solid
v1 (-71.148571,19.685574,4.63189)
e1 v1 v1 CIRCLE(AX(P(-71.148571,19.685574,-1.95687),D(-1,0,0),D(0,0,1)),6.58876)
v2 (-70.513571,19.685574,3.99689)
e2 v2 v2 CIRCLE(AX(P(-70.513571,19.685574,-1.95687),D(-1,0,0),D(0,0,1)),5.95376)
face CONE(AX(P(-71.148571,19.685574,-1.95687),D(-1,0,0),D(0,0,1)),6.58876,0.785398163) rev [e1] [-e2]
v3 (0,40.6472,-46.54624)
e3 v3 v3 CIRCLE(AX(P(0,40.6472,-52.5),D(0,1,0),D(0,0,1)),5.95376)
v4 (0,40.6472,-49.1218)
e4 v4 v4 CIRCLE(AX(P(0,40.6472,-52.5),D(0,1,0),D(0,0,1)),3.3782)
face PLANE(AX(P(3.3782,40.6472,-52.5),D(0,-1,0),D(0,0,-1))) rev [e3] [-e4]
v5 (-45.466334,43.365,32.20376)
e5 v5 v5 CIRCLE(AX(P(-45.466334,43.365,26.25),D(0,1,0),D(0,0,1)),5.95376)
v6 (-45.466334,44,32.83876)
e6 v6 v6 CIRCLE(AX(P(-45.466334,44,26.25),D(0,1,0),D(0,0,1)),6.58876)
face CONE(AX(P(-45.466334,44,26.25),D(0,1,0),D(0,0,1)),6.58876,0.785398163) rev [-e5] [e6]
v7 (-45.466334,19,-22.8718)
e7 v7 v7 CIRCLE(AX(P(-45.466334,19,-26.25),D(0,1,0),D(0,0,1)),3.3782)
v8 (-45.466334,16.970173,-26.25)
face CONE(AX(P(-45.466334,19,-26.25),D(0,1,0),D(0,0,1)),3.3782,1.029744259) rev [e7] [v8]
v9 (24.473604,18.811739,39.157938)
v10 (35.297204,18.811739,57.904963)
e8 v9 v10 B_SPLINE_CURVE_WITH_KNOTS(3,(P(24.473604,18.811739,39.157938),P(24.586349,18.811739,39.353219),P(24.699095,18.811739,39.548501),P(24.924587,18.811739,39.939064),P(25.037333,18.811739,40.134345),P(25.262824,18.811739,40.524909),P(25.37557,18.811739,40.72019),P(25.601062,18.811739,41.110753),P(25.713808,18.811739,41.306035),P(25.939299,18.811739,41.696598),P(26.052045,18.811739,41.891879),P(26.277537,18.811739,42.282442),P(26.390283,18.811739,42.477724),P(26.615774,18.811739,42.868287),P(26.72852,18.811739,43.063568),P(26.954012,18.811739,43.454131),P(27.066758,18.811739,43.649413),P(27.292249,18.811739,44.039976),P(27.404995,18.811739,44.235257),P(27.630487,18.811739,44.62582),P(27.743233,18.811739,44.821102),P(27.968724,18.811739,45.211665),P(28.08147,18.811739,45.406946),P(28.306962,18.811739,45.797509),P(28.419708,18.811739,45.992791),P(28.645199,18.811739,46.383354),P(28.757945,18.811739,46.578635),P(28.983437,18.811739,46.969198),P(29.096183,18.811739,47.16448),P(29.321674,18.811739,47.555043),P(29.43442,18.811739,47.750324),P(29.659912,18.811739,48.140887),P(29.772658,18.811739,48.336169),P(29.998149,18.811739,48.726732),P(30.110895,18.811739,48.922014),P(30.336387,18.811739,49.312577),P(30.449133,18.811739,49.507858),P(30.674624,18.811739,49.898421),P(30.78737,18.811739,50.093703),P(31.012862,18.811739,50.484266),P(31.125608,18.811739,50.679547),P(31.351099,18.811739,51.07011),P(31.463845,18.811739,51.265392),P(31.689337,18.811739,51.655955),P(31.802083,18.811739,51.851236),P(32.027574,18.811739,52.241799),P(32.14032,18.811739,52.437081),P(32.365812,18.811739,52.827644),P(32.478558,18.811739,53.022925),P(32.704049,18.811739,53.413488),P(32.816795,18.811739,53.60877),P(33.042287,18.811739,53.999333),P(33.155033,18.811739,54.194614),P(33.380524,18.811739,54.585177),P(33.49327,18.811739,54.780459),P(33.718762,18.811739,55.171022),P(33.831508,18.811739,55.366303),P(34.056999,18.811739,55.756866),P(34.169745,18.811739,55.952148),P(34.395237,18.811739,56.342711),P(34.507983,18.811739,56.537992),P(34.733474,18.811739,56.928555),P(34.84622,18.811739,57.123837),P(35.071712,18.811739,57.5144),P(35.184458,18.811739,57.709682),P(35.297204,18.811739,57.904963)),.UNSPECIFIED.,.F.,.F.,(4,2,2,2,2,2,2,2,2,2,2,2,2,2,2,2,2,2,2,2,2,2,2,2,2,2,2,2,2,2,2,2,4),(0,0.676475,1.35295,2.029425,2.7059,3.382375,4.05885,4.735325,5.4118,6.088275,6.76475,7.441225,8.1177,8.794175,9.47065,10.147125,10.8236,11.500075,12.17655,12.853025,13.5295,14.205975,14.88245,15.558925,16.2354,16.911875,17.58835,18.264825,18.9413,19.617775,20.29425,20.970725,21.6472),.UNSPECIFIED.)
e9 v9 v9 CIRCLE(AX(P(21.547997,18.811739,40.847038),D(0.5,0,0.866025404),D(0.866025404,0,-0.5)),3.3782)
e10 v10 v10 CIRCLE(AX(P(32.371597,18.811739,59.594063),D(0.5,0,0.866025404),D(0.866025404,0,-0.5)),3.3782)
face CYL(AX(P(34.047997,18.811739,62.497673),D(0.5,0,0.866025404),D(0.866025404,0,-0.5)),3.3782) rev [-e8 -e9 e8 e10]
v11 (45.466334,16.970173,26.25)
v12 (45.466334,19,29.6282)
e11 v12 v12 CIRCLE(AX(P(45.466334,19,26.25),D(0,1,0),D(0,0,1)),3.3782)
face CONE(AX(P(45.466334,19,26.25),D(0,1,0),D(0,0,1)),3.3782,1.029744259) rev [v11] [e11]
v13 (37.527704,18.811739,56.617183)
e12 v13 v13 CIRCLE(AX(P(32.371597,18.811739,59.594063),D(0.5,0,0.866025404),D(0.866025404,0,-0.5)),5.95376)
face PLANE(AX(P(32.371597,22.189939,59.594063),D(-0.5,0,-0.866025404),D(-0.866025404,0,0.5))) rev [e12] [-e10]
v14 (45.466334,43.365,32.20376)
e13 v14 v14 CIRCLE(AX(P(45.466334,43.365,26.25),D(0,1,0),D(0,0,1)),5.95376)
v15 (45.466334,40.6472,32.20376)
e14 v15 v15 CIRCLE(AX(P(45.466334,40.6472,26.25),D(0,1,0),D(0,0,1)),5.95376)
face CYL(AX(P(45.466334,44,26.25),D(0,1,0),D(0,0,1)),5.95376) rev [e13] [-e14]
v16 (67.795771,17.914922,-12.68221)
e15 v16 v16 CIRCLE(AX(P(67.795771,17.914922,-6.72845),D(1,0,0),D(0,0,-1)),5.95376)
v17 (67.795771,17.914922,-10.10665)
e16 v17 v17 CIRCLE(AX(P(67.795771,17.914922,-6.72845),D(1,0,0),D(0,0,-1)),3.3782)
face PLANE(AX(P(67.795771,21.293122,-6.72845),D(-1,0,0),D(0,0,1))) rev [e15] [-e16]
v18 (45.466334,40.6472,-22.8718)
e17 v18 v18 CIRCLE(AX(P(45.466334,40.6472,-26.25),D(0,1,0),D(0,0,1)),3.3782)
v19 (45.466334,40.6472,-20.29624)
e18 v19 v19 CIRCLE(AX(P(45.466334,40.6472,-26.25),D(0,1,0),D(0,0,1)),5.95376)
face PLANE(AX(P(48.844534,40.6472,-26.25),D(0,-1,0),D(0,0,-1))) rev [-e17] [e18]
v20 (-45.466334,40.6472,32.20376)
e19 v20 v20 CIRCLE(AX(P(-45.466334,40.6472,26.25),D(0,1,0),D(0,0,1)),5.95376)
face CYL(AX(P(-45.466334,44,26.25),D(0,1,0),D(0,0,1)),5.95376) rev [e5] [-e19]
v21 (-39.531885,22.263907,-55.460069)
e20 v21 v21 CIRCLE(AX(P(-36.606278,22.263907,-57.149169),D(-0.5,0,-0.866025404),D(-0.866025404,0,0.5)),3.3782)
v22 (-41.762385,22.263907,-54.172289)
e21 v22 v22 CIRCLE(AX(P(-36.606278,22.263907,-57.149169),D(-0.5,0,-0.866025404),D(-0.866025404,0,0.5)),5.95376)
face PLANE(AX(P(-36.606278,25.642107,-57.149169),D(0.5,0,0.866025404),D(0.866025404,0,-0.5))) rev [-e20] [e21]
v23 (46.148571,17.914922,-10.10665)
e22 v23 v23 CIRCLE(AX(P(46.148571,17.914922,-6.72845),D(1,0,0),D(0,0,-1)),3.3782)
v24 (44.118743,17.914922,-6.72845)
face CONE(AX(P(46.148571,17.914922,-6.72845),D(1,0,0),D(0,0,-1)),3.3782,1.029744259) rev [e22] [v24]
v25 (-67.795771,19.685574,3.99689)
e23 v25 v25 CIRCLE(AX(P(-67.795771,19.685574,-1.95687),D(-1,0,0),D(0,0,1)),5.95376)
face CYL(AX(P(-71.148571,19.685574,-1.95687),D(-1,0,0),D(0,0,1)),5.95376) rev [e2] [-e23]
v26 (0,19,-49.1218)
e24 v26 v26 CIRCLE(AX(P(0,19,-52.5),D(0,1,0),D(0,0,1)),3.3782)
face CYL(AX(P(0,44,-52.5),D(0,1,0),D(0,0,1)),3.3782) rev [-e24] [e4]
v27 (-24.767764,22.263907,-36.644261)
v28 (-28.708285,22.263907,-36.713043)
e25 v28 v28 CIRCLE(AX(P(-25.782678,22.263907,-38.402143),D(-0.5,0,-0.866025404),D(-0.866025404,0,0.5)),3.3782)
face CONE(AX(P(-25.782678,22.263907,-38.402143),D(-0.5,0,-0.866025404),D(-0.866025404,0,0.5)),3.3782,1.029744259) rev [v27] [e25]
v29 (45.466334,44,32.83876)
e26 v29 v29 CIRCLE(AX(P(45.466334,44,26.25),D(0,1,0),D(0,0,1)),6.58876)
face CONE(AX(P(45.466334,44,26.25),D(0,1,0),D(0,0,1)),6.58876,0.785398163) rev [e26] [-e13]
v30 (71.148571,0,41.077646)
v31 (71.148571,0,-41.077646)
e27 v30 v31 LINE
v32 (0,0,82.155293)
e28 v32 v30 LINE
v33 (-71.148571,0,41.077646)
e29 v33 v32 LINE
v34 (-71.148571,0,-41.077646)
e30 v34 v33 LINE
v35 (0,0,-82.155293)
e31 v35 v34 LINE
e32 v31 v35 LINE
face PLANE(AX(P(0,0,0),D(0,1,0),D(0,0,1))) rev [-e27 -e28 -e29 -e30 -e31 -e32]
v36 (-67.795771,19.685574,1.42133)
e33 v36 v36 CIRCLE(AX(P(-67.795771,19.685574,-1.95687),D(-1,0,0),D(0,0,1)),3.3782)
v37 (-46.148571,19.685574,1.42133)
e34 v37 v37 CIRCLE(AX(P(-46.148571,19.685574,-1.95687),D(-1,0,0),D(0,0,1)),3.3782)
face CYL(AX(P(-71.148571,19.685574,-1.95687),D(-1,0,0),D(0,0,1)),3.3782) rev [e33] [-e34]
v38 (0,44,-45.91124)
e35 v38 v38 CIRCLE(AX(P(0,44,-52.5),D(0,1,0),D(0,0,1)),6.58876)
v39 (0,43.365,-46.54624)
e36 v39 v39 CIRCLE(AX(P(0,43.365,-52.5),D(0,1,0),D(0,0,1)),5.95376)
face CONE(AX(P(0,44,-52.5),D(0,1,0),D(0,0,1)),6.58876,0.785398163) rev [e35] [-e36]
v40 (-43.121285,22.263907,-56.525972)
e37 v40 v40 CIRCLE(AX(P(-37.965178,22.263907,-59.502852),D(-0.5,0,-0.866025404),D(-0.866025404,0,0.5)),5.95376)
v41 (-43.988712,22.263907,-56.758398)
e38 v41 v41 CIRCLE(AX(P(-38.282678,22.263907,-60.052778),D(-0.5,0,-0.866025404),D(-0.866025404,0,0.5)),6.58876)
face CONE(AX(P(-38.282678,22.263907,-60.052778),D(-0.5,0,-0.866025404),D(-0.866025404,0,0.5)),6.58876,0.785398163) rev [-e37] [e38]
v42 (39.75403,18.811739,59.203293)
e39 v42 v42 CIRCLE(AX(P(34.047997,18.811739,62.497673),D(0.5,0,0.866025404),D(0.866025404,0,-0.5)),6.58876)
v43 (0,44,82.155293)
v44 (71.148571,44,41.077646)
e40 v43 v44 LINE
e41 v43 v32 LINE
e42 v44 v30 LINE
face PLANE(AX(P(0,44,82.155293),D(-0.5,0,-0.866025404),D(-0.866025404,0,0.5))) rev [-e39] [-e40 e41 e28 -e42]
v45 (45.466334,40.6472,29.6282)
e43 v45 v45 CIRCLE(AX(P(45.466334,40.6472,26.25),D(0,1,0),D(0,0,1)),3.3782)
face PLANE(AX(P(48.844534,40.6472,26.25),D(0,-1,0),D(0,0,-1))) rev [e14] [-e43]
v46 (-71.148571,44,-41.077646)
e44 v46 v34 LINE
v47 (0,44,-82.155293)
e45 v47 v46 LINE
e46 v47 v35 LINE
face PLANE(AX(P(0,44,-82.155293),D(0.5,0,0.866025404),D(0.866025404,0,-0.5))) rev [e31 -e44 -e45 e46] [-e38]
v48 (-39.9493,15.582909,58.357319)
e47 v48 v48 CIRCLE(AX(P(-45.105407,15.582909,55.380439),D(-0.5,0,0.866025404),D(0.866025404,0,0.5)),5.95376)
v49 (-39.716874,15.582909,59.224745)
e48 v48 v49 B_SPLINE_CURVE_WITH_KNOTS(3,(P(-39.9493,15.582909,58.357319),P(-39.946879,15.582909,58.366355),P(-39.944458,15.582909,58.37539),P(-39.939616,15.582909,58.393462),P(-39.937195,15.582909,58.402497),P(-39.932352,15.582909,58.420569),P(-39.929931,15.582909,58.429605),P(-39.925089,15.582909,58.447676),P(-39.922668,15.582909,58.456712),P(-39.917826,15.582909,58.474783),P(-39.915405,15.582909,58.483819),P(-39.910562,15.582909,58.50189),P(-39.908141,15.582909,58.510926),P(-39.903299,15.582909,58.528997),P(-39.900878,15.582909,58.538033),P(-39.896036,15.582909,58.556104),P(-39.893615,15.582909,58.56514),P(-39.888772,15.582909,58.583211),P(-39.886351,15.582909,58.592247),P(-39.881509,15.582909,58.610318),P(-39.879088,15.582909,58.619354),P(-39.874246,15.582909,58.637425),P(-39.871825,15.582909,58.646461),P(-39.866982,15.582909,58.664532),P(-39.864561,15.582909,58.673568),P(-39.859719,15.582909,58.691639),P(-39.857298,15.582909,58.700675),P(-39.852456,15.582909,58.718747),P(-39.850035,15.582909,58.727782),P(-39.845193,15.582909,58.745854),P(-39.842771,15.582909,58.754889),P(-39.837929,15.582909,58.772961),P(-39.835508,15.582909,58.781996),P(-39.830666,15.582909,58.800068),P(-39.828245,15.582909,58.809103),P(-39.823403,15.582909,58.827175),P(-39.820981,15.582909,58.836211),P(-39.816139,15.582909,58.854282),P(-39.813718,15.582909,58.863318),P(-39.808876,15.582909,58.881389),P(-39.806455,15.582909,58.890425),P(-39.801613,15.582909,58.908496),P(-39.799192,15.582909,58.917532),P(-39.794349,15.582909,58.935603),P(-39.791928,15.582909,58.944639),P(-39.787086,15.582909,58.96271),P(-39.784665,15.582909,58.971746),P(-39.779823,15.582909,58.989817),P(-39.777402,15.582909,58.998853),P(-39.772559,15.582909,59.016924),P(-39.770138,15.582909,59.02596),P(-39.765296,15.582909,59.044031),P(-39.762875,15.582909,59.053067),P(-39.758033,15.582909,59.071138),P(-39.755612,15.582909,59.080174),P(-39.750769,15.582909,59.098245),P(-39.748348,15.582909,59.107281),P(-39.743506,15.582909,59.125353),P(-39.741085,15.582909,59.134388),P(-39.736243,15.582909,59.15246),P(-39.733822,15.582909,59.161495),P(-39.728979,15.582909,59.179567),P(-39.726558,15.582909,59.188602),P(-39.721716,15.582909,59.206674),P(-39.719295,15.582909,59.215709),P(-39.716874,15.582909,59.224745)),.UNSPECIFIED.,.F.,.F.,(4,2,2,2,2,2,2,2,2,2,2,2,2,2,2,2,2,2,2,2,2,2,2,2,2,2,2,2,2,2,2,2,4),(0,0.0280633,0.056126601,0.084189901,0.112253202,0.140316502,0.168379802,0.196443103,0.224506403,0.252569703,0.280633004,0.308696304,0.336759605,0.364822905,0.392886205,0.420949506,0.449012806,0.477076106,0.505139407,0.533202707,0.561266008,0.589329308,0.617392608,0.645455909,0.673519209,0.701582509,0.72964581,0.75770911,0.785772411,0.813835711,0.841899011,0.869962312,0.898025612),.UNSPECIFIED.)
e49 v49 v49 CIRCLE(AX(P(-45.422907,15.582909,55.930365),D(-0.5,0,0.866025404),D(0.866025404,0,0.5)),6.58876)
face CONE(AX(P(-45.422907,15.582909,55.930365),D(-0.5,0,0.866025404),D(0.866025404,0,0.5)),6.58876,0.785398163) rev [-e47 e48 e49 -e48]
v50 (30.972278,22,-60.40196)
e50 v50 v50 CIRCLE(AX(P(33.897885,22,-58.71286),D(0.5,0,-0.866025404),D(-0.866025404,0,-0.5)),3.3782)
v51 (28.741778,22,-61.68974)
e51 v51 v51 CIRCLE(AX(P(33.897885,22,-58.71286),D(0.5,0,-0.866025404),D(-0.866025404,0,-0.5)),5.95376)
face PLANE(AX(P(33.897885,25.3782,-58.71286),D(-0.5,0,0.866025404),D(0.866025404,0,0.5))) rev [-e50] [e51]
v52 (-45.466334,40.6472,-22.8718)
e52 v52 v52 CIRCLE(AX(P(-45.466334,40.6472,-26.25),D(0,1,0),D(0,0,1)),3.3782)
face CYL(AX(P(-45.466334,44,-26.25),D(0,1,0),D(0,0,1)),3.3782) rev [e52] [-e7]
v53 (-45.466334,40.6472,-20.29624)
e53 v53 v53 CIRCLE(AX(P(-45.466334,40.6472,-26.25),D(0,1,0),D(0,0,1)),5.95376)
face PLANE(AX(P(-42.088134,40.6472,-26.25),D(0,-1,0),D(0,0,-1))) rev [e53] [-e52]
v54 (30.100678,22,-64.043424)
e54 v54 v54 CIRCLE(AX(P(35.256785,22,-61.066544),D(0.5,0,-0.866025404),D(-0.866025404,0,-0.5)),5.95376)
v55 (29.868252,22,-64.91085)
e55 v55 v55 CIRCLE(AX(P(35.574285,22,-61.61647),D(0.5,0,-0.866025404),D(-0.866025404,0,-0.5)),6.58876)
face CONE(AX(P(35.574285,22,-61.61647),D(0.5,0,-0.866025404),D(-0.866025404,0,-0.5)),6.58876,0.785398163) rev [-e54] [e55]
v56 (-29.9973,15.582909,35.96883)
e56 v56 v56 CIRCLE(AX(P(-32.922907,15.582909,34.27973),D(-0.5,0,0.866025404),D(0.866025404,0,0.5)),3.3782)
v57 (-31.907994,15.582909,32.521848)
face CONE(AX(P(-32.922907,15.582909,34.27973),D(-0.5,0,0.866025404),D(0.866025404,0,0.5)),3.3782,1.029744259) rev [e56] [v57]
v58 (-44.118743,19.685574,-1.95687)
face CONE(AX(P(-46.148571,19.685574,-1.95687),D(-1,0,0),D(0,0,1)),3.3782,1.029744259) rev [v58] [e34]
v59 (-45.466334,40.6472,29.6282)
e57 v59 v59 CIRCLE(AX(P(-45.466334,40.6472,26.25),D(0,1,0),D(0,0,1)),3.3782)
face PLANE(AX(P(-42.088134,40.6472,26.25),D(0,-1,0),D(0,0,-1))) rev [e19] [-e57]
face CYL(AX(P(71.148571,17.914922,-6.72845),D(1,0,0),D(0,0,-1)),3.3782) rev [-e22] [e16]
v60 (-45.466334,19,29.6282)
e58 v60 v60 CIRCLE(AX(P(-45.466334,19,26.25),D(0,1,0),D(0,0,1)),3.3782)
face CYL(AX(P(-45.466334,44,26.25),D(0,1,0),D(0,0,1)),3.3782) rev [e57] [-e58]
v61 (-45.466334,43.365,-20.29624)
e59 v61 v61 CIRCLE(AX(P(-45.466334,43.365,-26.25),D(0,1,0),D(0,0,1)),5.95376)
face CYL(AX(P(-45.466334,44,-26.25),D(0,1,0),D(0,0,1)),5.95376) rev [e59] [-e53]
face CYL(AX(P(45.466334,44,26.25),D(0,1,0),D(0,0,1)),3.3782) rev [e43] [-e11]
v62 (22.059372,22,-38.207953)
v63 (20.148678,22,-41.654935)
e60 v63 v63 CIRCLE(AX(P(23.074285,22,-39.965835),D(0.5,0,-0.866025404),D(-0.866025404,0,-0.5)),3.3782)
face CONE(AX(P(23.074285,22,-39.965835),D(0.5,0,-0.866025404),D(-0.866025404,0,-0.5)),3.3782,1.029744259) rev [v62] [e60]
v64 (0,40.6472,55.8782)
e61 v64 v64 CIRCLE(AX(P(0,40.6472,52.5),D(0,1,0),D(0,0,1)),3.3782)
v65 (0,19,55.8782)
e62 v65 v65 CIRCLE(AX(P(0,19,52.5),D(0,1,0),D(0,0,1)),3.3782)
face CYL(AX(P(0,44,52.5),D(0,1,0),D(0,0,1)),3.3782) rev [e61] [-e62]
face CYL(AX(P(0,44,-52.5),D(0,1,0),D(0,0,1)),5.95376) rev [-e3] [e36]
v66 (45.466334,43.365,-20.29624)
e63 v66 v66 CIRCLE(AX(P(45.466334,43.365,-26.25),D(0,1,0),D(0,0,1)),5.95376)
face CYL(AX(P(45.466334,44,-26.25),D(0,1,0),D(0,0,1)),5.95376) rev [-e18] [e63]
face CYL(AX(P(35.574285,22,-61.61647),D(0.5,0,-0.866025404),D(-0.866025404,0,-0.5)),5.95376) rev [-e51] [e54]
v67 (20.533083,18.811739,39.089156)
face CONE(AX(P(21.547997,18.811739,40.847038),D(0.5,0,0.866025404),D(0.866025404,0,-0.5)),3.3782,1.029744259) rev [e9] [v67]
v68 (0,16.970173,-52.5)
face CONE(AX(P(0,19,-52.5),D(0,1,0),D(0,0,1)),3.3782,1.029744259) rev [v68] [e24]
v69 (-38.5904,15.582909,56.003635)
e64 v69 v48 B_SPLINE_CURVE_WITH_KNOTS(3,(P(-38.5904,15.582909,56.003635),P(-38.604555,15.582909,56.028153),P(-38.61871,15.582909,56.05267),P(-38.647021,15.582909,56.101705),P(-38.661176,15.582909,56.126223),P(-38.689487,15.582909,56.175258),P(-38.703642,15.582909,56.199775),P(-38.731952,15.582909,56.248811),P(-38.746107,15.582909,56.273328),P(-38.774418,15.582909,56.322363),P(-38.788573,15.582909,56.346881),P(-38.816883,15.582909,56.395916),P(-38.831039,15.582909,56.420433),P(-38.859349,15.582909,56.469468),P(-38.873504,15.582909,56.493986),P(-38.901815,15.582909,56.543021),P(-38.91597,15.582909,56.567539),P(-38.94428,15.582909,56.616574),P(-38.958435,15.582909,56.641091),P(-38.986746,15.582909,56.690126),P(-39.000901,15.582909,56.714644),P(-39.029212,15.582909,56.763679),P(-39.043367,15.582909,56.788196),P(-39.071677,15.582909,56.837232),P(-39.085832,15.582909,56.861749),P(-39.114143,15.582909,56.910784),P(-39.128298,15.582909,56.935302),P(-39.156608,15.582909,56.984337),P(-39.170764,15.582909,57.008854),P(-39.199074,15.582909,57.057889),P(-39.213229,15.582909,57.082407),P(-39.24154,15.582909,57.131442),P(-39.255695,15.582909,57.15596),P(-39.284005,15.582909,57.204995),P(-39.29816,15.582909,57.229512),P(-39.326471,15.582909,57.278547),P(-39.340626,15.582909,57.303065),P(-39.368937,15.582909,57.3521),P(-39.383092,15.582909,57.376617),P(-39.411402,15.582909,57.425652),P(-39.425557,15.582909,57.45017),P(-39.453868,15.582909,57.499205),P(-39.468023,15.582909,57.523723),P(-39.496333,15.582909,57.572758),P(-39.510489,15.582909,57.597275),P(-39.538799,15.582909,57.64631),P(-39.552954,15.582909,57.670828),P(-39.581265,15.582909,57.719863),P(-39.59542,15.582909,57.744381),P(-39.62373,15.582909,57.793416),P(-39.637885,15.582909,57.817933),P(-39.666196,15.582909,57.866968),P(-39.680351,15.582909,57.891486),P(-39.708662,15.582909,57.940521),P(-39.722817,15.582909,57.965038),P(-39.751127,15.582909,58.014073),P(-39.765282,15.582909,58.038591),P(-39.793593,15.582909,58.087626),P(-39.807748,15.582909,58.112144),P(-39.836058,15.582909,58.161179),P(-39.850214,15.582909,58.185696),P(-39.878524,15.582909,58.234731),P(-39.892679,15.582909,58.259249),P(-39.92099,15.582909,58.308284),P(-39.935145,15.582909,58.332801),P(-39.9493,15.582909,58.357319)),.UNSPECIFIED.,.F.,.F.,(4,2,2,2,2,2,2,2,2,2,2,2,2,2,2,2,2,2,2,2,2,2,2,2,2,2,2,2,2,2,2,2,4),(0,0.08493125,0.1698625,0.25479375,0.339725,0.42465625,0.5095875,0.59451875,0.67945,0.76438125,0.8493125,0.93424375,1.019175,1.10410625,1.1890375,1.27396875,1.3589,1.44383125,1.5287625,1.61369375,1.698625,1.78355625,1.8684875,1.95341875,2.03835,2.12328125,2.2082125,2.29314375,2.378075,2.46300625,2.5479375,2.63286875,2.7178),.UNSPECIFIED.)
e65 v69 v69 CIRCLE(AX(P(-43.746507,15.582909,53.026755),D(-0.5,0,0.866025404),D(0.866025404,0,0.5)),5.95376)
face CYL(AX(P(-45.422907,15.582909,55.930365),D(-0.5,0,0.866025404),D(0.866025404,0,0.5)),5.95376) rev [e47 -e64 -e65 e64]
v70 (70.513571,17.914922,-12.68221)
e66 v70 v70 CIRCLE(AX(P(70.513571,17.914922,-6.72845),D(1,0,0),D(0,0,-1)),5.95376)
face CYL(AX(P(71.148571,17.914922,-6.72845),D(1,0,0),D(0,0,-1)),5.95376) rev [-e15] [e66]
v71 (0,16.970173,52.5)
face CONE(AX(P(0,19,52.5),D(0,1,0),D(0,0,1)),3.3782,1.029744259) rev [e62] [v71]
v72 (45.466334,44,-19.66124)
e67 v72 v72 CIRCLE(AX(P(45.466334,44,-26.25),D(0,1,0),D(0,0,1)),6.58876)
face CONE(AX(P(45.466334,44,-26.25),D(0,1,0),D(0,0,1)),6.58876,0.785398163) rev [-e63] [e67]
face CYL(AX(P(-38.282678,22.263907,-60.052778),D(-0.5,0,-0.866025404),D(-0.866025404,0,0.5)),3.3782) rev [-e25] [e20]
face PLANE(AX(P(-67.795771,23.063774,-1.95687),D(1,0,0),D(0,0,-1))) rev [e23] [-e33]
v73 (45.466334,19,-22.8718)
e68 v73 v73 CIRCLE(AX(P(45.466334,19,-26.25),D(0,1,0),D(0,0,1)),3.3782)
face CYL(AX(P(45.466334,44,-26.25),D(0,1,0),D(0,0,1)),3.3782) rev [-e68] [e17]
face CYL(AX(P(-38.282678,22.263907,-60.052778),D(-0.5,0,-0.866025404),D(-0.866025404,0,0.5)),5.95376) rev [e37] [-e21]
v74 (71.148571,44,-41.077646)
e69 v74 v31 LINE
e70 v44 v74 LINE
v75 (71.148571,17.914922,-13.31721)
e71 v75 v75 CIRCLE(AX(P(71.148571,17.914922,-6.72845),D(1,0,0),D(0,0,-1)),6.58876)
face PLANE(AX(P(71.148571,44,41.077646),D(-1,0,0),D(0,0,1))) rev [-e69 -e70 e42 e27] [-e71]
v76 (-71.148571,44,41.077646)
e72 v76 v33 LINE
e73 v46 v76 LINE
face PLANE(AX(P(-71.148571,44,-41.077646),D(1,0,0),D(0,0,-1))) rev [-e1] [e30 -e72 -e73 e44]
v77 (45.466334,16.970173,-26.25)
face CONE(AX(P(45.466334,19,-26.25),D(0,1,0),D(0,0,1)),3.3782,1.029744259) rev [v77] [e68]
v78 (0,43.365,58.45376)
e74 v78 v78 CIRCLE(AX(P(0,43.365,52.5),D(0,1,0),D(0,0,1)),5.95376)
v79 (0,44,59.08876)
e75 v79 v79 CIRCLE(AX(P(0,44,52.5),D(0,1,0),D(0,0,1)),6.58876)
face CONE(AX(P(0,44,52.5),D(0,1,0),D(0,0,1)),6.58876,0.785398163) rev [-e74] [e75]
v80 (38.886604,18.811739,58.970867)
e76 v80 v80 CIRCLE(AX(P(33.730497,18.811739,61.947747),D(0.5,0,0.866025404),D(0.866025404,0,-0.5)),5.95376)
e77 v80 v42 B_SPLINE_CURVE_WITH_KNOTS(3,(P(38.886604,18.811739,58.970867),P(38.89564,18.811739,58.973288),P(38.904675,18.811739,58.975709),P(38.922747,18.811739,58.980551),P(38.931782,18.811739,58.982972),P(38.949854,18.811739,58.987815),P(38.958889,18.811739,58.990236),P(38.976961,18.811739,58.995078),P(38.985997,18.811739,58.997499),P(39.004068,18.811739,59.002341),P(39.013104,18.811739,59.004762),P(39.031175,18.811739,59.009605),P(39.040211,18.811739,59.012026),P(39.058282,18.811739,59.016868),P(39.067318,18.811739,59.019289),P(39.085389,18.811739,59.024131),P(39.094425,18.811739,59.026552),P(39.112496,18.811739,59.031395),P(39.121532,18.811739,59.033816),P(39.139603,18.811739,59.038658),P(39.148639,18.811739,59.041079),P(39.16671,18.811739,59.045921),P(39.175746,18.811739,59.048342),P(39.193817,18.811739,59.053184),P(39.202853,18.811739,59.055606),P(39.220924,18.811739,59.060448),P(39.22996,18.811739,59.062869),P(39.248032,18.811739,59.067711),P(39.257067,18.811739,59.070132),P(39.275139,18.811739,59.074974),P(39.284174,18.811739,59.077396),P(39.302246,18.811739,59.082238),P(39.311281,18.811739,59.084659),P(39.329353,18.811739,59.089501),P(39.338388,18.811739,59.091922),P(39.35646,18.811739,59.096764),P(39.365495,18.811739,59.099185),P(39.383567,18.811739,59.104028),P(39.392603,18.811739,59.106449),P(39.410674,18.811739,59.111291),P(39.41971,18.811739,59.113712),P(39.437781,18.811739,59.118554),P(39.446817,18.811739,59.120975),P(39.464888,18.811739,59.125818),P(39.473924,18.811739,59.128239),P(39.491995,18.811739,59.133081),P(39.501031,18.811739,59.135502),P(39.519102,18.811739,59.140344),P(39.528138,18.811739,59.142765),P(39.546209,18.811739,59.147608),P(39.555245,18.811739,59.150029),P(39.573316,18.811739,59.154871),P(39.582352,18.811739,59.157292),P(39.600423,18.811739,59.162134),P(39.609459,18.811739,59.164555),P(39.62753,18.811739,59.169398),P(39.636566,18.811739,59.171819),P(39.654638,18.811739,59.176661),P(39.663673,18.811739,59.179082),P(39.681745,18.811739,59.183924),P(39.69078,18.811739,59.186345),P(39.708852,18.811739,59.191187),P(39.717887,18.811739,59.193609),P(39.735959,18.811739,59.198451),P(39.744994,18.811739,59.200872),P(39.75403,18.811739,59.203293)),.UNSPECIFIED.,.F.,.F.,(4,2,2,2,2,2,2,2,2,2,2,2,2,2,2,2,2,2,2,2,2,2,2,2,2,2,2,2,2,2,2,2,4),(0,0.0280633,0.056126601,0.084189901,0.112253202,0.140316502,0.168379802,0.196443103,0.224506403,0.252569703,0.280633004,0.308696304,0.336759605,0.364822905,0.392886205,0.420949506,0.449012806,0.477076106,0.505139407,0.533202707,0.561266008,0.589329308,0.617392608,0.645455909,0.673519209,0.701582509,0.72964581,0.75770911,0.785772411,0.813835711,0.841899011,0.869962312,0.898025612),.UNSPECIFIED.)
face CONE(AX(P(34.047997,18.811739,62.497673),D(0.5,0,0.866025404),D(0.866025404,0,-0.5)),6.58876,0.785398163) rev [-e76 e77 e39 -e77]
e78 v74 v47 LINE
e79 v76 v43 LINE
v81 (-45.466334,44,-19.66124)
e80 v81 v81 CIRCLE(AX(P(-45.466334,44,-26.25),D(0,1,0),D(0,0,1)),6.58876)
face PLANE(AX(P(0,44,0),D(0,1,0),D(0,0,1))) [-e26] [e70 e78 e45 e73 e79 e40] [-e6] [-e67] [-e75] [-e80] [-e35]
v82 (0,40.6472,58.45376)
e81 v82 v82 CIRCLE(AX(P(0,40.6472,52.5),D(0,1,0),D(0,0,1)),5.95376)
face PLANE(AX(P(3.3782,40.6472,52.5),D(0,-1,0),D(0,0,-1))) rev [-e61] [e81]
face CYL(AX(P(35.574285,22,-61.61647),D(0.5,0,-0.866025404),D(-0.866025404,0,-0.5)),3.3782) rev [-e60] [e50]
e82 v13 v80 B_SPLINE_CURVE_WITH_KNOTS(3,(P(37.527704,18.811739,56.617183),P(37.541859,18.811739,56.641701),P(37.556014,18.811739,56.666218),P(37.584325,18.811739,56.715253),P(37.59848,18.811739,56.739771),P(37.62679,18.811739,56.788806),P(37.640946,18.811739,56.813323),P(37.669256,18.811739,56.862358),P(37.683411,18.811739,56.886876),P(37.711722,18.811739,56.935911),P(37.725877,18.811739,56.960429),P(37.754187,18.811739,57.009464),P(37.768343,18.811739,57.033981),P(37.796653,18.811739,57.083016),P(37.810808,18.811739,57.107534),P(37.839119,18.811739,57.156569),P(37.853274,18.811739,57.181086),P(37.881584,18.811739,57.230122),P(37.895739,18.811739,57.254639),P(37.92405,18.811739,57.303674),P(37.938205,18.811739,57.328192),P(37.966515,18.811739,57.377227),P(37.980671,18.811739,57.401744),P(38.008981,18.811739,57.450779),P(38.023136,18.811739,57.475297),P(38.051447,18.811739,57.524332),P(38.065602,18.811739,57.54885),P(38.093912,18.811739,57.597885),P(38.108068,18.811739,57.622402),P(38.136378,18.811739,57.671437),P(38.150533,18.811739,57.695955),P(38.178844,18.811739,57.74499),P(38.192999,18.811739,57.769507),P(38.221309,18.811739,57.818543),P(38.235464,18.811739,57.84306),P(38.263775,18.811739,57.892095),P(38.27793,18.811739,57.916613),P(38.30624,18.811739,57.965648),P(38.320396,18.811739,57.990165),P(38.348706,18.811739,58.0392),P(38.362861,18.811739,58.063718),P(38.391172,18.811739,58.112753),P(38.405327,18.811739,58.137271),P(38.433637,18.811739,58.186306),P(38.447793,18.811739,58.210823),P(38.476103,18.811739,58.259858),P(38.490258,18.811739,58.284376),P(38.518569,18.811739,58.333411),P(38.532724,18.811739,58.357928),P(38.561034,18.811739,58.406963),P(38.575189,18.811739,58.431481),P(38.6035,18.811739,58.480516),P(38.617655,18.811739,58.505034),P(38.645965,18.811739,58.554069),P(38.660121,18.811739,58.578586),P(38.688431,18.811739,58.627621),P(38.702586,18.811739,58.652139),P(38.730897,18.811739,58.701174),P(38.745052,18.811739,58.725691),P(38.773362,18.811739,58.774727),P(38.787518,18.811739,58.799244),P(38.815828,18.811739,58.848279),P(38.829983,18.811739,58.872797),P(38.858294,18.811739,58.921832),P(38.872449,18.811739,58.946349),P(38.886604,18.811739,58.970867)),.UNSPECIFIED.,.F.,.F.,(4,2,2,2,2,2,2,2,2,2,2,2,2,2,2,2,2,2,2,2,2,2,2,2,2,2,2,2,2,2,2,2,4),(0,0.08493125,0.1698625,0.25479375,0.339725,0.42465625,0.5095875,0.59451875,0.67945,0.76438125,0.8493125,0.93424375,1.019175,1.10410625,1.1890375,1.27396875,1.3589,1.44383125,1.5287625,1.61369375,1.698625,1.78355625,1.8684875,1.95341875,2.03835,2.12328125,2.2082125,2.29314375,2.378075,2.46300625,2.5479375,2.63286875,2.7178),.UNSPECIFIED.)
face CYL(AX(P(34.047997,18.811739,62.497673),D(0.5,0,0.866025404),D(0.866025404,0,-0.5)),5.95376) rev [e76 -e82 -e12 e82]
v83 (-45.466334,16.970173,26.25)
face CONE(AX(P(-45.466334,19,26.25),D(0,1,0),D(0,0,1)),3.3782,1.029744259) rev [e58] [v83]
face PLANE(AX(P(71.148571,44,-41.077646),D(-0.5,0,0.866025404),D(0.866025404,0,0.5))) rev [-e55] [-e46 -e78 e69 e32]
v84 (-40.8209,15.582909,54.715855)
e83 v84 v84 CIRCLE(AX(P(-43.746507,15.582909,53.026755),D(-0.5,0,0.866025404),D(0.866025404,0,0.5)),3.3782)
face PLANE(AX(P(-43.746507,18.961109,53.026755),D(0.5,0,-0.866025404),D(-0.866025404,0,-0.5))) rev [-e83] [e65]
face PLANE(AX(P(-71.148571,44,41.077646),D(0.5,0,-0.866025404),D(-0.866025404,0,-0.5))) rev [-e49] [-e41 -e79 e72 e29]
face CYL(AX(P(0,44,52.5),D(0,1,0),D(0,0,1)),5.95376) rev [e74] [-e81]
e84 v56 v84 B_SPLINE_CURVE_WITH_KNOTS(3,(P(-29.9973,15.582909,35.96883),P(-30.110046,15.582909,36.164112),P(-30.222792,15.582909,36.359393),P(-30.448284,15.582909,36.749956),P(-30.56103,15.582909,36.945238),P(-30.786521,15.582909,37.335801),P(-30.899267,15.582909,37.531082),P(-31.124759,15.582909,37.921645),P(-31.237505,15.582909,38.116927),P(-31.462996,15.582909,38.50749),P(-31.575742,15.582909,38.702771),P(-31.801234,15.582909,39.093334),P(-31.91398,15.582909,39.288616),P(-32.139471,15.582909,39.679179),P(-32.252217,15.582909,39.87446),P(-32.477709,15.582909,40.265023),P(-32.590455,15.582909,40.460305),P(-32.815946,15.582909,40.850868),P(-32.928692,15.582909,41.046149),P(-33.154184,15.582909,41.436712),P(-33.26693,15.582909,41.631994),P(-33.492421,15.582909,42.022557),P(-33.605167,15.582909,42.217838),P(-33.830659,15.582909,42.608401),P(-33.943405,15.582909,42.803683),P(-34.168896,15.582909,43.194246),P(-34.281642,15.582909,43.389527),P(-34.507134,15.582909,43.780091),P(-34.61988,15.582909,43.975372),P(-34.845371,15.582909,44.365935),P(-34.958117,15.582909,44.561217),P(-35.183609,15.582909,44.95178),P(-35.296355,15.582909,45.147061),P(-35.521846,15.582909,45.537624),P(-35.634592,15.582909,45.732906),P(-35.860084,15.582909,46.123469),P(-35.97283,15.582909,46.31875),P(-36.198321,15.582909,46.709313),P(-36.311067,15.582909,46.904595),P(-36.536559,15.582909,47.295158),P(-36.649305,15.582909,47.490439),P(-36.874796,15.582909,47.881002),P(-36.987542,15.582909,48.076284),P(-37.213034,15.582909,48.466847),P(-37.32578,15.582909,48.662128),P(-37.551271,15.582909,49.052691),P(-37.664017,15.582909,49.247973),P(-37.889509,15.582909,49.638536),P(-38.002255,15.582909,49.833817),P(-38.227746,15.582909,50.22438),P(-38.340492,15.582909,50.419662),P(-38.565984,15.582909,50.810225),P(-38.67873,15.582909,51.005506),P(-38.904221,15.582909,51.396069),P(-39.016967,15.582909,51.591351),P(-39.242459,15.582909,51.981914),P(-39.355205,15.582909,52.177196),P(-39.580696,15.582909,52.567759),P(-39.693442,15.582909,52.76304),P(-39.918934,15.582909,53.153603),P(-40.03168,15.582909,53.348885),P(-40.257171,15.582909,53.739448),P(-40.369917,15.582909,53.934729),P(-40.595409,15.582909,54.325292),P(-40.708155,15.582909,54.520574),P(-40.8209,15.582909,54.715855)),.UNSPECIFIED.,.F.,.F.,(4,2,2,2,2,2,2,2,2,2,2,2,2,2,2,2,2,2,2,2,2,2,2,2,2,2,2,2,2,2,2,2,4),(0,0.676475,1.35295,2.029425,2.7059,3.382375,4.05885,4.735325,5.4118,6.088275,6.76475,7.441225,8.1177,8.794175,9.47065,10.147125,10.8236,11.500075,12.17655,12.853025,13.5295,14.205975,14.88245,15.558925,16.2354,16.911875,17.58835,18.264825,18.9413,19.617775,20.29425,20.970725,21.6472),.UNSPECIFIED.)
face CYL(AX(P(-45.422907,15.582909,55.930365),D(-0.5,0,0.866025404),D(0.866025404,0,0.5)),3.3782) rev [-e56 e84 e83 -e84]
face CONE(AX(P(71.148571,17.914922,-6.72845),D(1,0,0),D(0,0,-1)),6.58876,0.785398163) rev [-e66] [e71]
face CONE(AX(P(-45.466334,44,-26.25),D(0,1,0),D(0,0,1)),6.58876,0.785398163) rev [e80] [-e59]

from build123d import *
from OCP.BRepAlgoAPI import BRepAlgoAPI_Cut
from OCP.TopTools import TopTools_ListOfShape

# Parameters (mm, degrees)
BOSS_EXTRUDE1_DEPTH = 44


with BuildPart() as part:
    # Sketch1 → Boss-Extrude1 (new body)
    with BuildSketch(Plane(origin=(0, 0, 0), x_dir=(1, 0, 0), z_dir=(0, 1, 0))):
        Polygon((0, 82.155292998), (-71.148570791, 41.077646499), (-71.148570791, -41.077646499), (0, -82.155292998), (71.148570791, -41.077646499), (71.148570791, 41.077646499), align=None)
    extrude(amount=BOSS_EXTRUDE1_DEPTH)


with BuildPart() as cbore_for_1_4_button_head_cap_screw1_tool:
    # Sketch2 → CBORE for 1/4 Button Head Cap Screw1 (revolve)
    with BuildSketch(Plane(origin=(71.148570791, 17.91492161, -6.728449567), x_dir=(0, 0, -1), z_dir=(0, 1, 0))):
        Polygon((0, 0), (0, 27.029827343), (3.3782, 25), (3.3782, 3.3528), (5.95376, 3.3528), (5.95376, 0.635), (6.58876, 0), align=None)
    revolve(axis=Axis((77.498570791, 17.91492161, -6.728449567), (-1, 0, 0)))


with BuildPart() as part_1:
    add(part.part)

    # CBORE for 1/4 Button Head Cap Screw1: cut by cbore_for_1_4_button_head_cap_screw1_tool, with a tolerance
    cbore_for_1_4_button_head_cap_screw1_stock = TopTools_ListOfShape()
    cbore_for_1_4_button_head_cap_screw1_stock.Append(part_1.part.wrapped)
    cbore_for_1_4_button_head_cap_screw1_tools = TopTools_ListOfShape()
    cbore_for_1_4_button_head_cap_screw1_tools.Append(cbore_for_1_4_button_head_cap_screw1_tool.part.wrapped)
    cbore_for_1_4_button_head_cap_screw1_cut = BRepAlgoAPI_Cut()
    cbore_for_1_4_button_head_cap_screw1_cut.SetArguments(cbore_for_1_4_button_head_cap_screw1_stock)
    cbore_for_1_4_button_head_cap_screw1_cut.SetTools(cbore_for_1_4_button_head_cap_screw1_tools)
    cbore_for_1_4_button_head_cap_screw1_cut.SetFuzzyValue(0.00001)
    cbore_for_1_4_button_head_cap_screw1_cut.Build()
    add(Compound.cast(cbore_for_1_4_button_head_cap_screw1_cut.Shape()).solids(), mode=Mode.REPLACE)


with BuildPart() as cbore_for_1_4_button_head_cap_screw1_at_tool:
    # Sketch2 at point 2 (carried to point 2, square into its face) → CBORE for 1/4 Button Head Cap Screw1 at (revolve)
    with BuildSketch(Plane(origin=(34.047996554, 18.811739105, 62.497673022), x_dir=(0.866025303, 0, -0.500000175), z_dir=(0, 1, 0))):
        Polygon((0, 0), (0, 27.029827343), (3.3782, 25), (3.3782, 3.3528), (5.95376, 3.3528), (5.95376, 0.635), (6.58876, 0), align=None)
    revolve(axis=Axis((37.222997664, 18.811739105, 67.996933695), (-0.500000175, 0, -0.866025303)))


with BuildPart() as part_2:
    add(part_1.part)

    # CBORE for 1/4 Button Head Cap Screw1 at: cut by cbore_for_1_4_button_head_cap_screw1_at_tool, with a tolerance
    cbore_for_1_4_button_head_cap_screw1_at_stock = TopTools_ListOfShape()
    cbore_for_1_4_button_head_cap_screw1_at_stock.Append(part_2.part.wrapped)
    cbore_for_1_4_button_head_cap_screw1_at_tools = TopTools_ListOfShape()
    cbore_for_1_4_button_head_cap_screw1_at_tools.Append(cbore_for_1_4_button_head_cap_screw1_at_tool.part.wrapped)
    cbore_for_1_4_button_head_cap_screw1_at_cut = BRepAlgoAPI_Cut()
    cbore_for_1_4_button_head_cap_screw1_at_cut.SetArguments(cbore_for_1_4_button_head_cap_screw1_at_stock)
    cbore_for_1_4_button_head_cap_screw1_at_cut.SetTools(cbore_for_1_4_button_head_cap_screw1_at_tools)
    cbore_for_1_4_button_head_cap_screw1_at_cut.SetFuzzyValue(0.00001)
    cbore_for_1_4_button_head_cap_screw1_at_cut.Build()
    add(Compound.cast(cbore_for_1_4_button_head_cap_screw1_at_cut.Shape()).solids(), mode=Mode.REPLACE)


with BuildPart() as cbore_for_1_4_button_head_cap_screw1_2_tool:
    # Sketch2 at point 3 (carried to point 3, square into its face) → CBORE for 1_4 Button Head Cap Screw1 2 (revolve)
    with BuildSketch(Plane(origin=(-45.42290748, 15.582909189, 55.930365137), x_dir=(0.866025303, 0, 0.500000175), z_dir=(0, 1, 0))):
        Polygon((0, 0), (0, 27.029827343), (3.3782, 25), (3.3782, 3.3528), (5.95376, 3.3528), (5.95376, 0.635), (6.58876, 0), align=None)
    revolve(axis=Axis((-48.59790859, 15.582909189, 61.42962581), (0.500000175, 0, -0.866025303)))


with BuildPart() as part_3:
    add(part_2.part)

    # CBORE for 1_4 Button Head Cap Screw1 2: cut by cbore_for_1_4_button_head_cap_screw1_2_tool, with a tolerance
    cbore_for_1_4_button_head_cap_screw1_2_stock = TopTools_ListOfShape()
    cbore_for_1_4_button_head_cap_screw1_2_stock.Append(part_3.part.wrapped)
    cbore_for_1_4_button_head_cap_screw1_2_tools = TopTools_ListOfShape()
    cbore_for_1_4_button_head_cap_screw1_2_tools.Append(cbore_for_1_4_button_head_cap_screw1_2_tool.part.wrapped)
    cbore_for_1_4_button_head_cap_screw1_2_cut = BRepAlgoAPI_Cut()
    cbore_for_1_4_button_head_cap_screw1_2_cut.SetArguments(cbore_for_1_4_button_head_cap_screw1_2_stock)
    cbore_for_1_4_button_head_cap_screw1_2_cut.SetTools(cbore_for_1_4_button_head_cap_screw1_2_tools)
    cbore_for_1_4_button_head_cap_screw1_2_cut.SetFuzzyValue(0.00001)
    cbore_for_1_4_button_head_cap_screw1_2_cut.Build()
    add(Compound.cast(cbore_for_1_4_button_head_cap_screw1_2_cut.Shape()).solids(), mode=Mode.REPLACE)


with BuildPart() as cbore_for_1_4_button_head_cap_screw1_3_tool:
    # Sketch2 at point 4 (carried to point 4, square into its face) → CBORE for 1_4 Button Head Cap Screw1 3 (revolve)
    with BuildSketch(Plane(origin=(-71.148570791, 19.685573665, -1.956870484), x_dir=(0, 0, -1), z_dir=(0, -1, 0))):
        Polygon((0, 0), (0, 27.029827343), (3.3782, 25), (3.3782, 3.3528), (5.95376, 3.3528), (5.95376, 0.635), (6.58876, 0), align=None)
    revolve(axis=Axis((-77.498570791, 19.685573665, -1.956870484), (1, 0, 0)))


with BuildPart() as part_4:
    add(part_3.part)

    # CBORE for 1_4 Button Head Cap Screw1 3: cut by cbore_for_1_4_button_head_cap_screw1_3_tool, with a tolerance
    cbore_for_1_4_button_head_cap_screw1_3_stock = TopTools_ListOfShape()
    cbore_for_1_4_button_head_cap_screw1_3_stock.Append(part_4.part.wrapped)
    cbore_for_1_4_button_head_cap_screw1_3_tools = TopTools_ListOfShape()
    cbore_for_1_4_button_head_cap_screw1_3_tools.Append(cbore_for_1_4_button_head_cap_screw1_3_tool.part.wrapped)
    cbore_for_1_4_button_head_cap_screw1_3_cut = BRepAlgoAPI_Cut()
    cbore_for_1_4_button_head_cap_screw1_3_cut.SetArguments(cbore_for_1_4_button_head_cap_screw1_3_stock)
    cbore_for_1_4_button_head_cap_screw1_3_cut.SetTools(cbore_for_1_4_button_head_cap_screw1_3_tools)
    cbore_for_1_4_button_head_cap_screw1_3_cut.SetFuzzyValue(0.00001)
    cbore_for_1_4_button_head_cap_screw1_3_cut.Build()
    add(Compound.cast(cbore_for_1_4_button_head_cap_screw1_3_cut.Shape()).solids(), mode=Mode.REPLACE)


with BuildPart() as cbore_for_1_4_button_head_cap_screw1_4_tool:
    # Sketch2 at point 5 (carried to point 5, square into its face) → CBORE for 1_4 Button Head Cap Screw1 4 (revolve)
    with BuildSketch(Plane(origin=(-38.282678088, 22.263906774, -60.052778498), x_dir=(-0.866025303, 0, 0.500000175), z_dir=(0, 1, 0))):
        Polygon((0, 0), (0, 27.029827343), (3.3782, 25), (3.3782, 3.3528), (5.95376, 3.3528), (5.95376, 0.635), (6.58876, 0), align=None)
    revolve(axis=Axis((-41.457679199, 22.263906774, -65.552039171), (0.500000175, 0, 0.866025303)))


with BuildPart() as part_5:
    add(part_4.part)

    # CBORE for 1_4 Button Head Cap Screw1 4: cut by cbore_for_1_4_button_head_cap_screw1_4_tool, with a tolerance
    cbore_for_1_4_button_head_cap_screw1_4_stock = TopTools_ListOfShape()
    cbore_for_1_4_button_head_cap_screw1_4_stock.Append(part_5.part.wrapped)
    cbore_for_1_4_button_head_cap_screw1_4_tools = TopTools_ListOfShape()
    cbore_for_1_4_button_head_cap_screw1_4_tools.Append(cbore_for_1_4_button_head_cap_screw1_4_tool.part.wrapped)
    cbore_for_1_4_button_head_cap_screw1_4_cut = BRepAlgoAPI_Cut()
    cbore_for_1_4_button_head_cap_screw1_4_cut.SetArguments(cbore_for_1_4_button_head_cap_screw1_4_stock)
    cbore_for_1_4_button_head_cap_screw1_4_cut.SetTools(cbore_for_1_4_button_head_cap_screw1_4_tools)
    cbore_for_1_4_button_head_cap_screw1_4_cut.SetFuzzyValue(0.00001)
    cbore_for_1_4_button_head_cap_screw1_4_cut.Build()
    add(Compound.cast(cbore_for_1_4_button_head_cap_screw1_4_cut.Shape()).solids(), mode=Mode.REPLACE)


with BuildPart() as cbore_for_1_4_button_head_cap_screw1_5_tool:
    # Sketch2 at point 6 (carried to point 6, square into its face) → CBORE for 1_4 Button Head Cap Screw1 5 (revolve)
    with BuildSketch(Plane(origin=(35.574285396, 22, -61.616469748), x_dir=(-0.866025303, 0, -0.500000175), z_dir=(0, 1, 0))):
        Polygon((0, 0), (0, 27.029827343), (3.3782, 25), (3.3782, 3.3528), (5.95376, 3.3528), (5.95376, 0.635), (6.58876, 0), align=None)
    revolve(axis=Axis((38.749286506, 22, -67.115730421), (-0.500000175, 0, 0.866025303)))


with BuildPart() as part_6:
    add(part_5.part)

    # CBORE for 1_4 Button Head Cap Screw1 5: cut by cbore_for_1_4_button_head_cap_screw1_5_tool, with a tolerance
    cbore_for_1_4_button_head_cap_screw1_5_stock = TopTools_ListOfShape()
    cbore_for_1_4_button_head_cap_screw1_5_stock.Append(part_6.part.wrapped)
    cbore_for_1_4_button_head_cap_screw1_5_tools = TopTools_ListOfShape()
    cbore_for_1_4_button_head_cap_screw1_5_tools.Append(cbore_for_1_4_button_head_cap_screw1_5_tool.part.wrapped)
    cbore_for_1_4_button_head_cap_screw1_5_cut = BRepAlgoAPI_Cut()
    cbore_for_1_4_button_head_cap_screw1_5_cut.SetArguments(cbore_for_1_4_button_head_cap_screw1_5_stock)
    cbore_for_1_4_button_head_cap_screw1_5_cut.SetTools(cbore_for_1_4_button_head_cap_screw1_5_tools)
    cbore_for_1_4_button_head_cap_screw1_5_cut.SetFuzzyValue(0.00001)
    cbore_for_1_4_button_head_cap_screw1_5_cut.Build()
    add(Compound.cast(cbore_for_1_4_button_head_cap_screw1_5_cut.Shape()).solids(), mode=Mode.REPLACE)


with BuildPart() as cbore_for_1_4_button_head_cap_screw1_6_tool:
    # Sketch2 at point 7 (carried to point 7, square into its face) → CBORE for 1_4 Button Head Cap Screw1 6 (revolve)
    with BuildSketch(Plane(origin=(-45.466333699, 44, -26.25), x_dir=(0, 0, -1), z_dir=(-1, 0, 0))):
        Polygon((0, 0), (0, 27.029827343), (3.3782, 25), (3.3782, 3.3528), (5.95376, 3.3528), (5.95376, 0.635), (6.58876, 0), align=None)
    revolve(axis=Axis((-45.466333699, 50.35, -26.25), (0, -1, 0)))


with BuildPart() as part_7:
    add(part_6.part)

    # CBORE for 1_4 Button Head Cap Screw1 6: cut by cbore_for_1_4_button_head_cap_screw1_6_tool, with a tolerance
    cbore_for_1_4_button_head_cap_screw1_6_stock = TopTools_ListOfShape()
    cbore_for_1_4_button_head_cap_screw1_6_stock.Append(part_7.part.wrapped)
    cbore_for_1_4_button_head_cap_screw1_6_tools = TopTools_ListOfShape()
    cbore_for_1_4_button_head_cap_screw1_6_tools.Append(cbore_for_1_4_button_head_cap_screw1_6_tool.part.wrapped)
    cbore_for_1_4_button_head_cap_screw1_6_cut = BRepAlgoAPI_Cut()
    cbore_for_1_4_button_head_cap_screw1_6_cut.SetArguments(cbore_for_1_4_button_head_cap_screw1_6_stock)
    cbore_for_1_4_button_head_cap_screw1_6_cut.SetTools(cbore_for_1_4_button_head_cap_screw1_6_tools)
    cbore_for_1_4_button_head_cap_screw1_6_cut.SetFuzzyValue(0.00001)
    cbore_for_1_4_button_head_cap_screw1_6_cut.Build()
    add(Compound.cast(cbore_for_1_4_button_head_cap_screw1_6_cut.Shape()).solids(), mode=Mode.REPLACE)


with BuildPart() as cbore_for_1_4_button_head_cap_screw1_7_tool:
    # Sketch2 at point 8 (carried to point 8, square into its face) → CBORE for 1_4 Button Head Cap Screw1 7 (revolve)
    with BuildSketch(Plane(origin=(0, 44, -52.5), x_dir=(0, 0, -1), z_dir=(-1, 0, 0))):
        Polygon((0, 0), (0, 27.029827343), (3.3782, 25), (3.3782, 3.3528), (5.95376, 3.3528), (5.95376, 0.635), (6.58876, 0), align=None)
    revolve(axis=Axis((0, 50.35, -52.5), (0, -1, 0)))


with BuildPart() as part_8:
    add(part_7.part)

    # CBORE for 1_4 Button Head Cap Screw1 7: cut by cbore_for_1_4_button_head_cap_screw1_7_tool, with a tolerance
    cbore_for_1_4_button_head_cap_screw1_7_stock = TopTools_ListOfShape()
    cbore_for_1_4_button_head_cap_screw1_7_stock.Append(part_8.part.wrapped)
    cbore_for_1_4_button_head_cap_screw1_7_tools = TopTools_ListOfShape()
    cbore_for_1_4_button_head_cap_screw1_7_tools.Append(cbore_for_1_4_button_head_cap_screw1_7_tool.part.wrapped)
    cbore_for_1_4_button_head_cap_screw1_7_cut = BRepAlgoAPI_Cut()
    cbore_for_1_4_button_head_cap_screw1_7_cut.SetArguments(cbore_for_1_4_button_head_cap_screw1_7_stock)
    cbore_for_1_4_button_head_cap_screw1_7_cut.SetTools(cbore_for_1_4_button_head_cap_screw1_7_tools)
    cbore_for_1_4_button_head_cap_screw1_7_cut.SetFuzzyValue(0.00001)
    cbore_for_1_4_button_head_cap_screw1_7_cut.Build()
    add(Compound.cast(cbore_for_1_4_button_head_cap_screw1_7_cut.Shape()).solids(), mode=Mode.REPLACE)


with BuildPart() as cbore_for_1_4_button_head_cap_screw1_8_tool:
    # Sketch2 at point 9 (carried to point 9, square into its face) → CBORE for 1_4 Button Head Cap Screw1 8 (revolve)
    with BuildSketch(Plane(origin=(45.466333699, 44, -26.25), x_dir=(0, 0, -1), z_dir=(-1, 0, 0))):
        Polygon((0, 0), (0, 27.029827343), (3.3782, 25), (3.3782, 3.3528), (5.95376, 3.3528), (5.95376, 0.635), (6.58876, 0), align=None)
    revolve(axis=Axis((45.466333699, 50.35, -26.25), (0, -1, 0)))


with BuildPart() as part_9:
    add(part_8.part)

    # CBORE for 1_4 Button Head Cap Screw1 8: cut by cbore_for_1_4_button_head_cap_screw1_8_tool, with a tolerance
    cbore_for_1_4_button_head_cap_screw1_8_stock = TopTools_ListOfShape()
    cbore_for_1_4_button_head_cap_screw1_8_stock.Append(part_9.part.wrapped)
    cbore_for_1_4_button_head_cap_screw1_8_tools = TopTools_ListOfShape()
    cbore_for_1_4_button_head_cap_screw1_8_tools.Append(cbore_for_1_4_button_head_cap_screw1_8_tool.part.wrapped)
    cbore_for_1_4_button_head_cap_screw1_8_cut = BRepAlgoAPI_Cut()
    cbore_for_1_4_button_head_cap_screw1_8_cut.SetArguments(cbore_for_1_4_button_head_cap_screw1_8_stock)
    cbore_for_1_4_button_head_cap_screw1_8_cut.SetTools(cbore_for_1_4_button_head_cap_screw1_8_tools)
    cbore_for_1_4_button_head_cap_screw1_8_cut.SetFuzzyValue(0.00001)
    cbore_for_1_4_button_head_cap_screw1_8_cut.Build()
    add(Compound.cast(cbore_for_1_4_button_head_cap_screw1_8_cut.Shape()).solids(), mode=Mode.REPLACE)


with BuildPart() as cbore_for_1_4_button_head_cap_screw1_9_tool:
    # Sketch2 at point 10 (carried to point 10, square into its face) → CBORE for 1_4 Button Head Cap Screw1 9 (revolve)
    with BuildSketch(Plane(origin=(45.466333699, 44, 26.25), x_dir=(0, 0, -1), z_dir=(-1, 0, 0))):
        Polygon((0, 0), (0, 27.029827343), (3.3782, 25), (3.3782, 3.3528), (5.95376, 3.3528), (5.95376, 0.635), (6.58876, 0), align=None)
    revolve(axis=Axis((45.466333699, 50.35, 26.25), (0, -1, 0)))


with BuildPart() as part_10:
    add(part_9.part)

    # CBORE for 1_4 Button Head Cap Screw1 9: cut by cbore_for_1_4_button_head_cap_screw1_9_tool, with a tolerance
    cbore_for_1_4_button_head_cap_screw1_9_stock = TopTools_ListOfShape()
    cbore_for_1_4_button_head_cap_screw1_9_stock.Append(part_10.part.wrapped)
    cbore_for_1_4_button_head_cap_screw1_9_tools = TopTools_ListOfShape()
    cbore_for_1_4_button_head_cap_screw1_9_tools.Append(cbore_for_1_4_button_head_cap_screw1_9_tool.part.wrapped)
    cbore_for_1_4_button_head_cap_screw1_9_cut = BRepAlgoAPI_Cut()
    cbore_for_1_4_button_head_cap_screw1_9_cut.SetArguments(cbore_for_1_4_button_head_cap_screw1_9_stock)
    cbore_for_1_4_button_head_cap_screw1_9_cut.SetTools(cbore_for_1_4_button_head_cap_screw1_9_tools)
    cbore_for_1_4_button_head_cap_screw1_9_cut.SetFuzzyValue(0.00001)
    cbore_for_1_4_button_head_cap_screw1_9_cut.Build()
    add(Compound.cast(cbore_for_1_4_button_head_cap_screw1_9_cut.Shape()).solids(), mode=Mode.REPLACE)


with BuildPart() as cbore_for_1_4_button_head_cap_screw1_10_tool:
    # Sketch2 at point 11 (carried to point 11, square into its face) → CBORE for 1_4 Button Head Cap Screw1 10 (revolve)
    with BuildSketch(Plane(origin=(0, 44, 52.5), x_dir=(0, 0, -1), z_dir=(-1, 0, 0))):
        Polygon((0, 0), (0, 27.029827343), (3.3782, 25), (3.3782, 3.3528), (5.95376, 3.3528), (5.95376, 0.635), (6.58876, 0), align=None)
    revolve(axis=Axis((0, 50.35, 52.5), (0, -1, 0)))


with BuildPart() as part_11:
    add(part_10.part)

    # CBORE for 1_4 Button Head Cap Screw1 10: cut by cbore_for_1_4_button_head_cap_screw1_10_tool, with a tolerance
    cbore_for_1_4_button_head_cap_screw1_10_stock = TopTools_ListOfShape()
    cbore_for_1_4_button_head_cap_screw1_10_stock.Append(part_11.part.wrapped)
    cbore_for_1_4_button_head_cap_screw1_10_tools = TopTools_ListOfShape()
    cbore_for_1_4_button_head_cap_screw1_10_tools.Append(cbore_for_1_4_button_head_cap_screw1_10_tool.part.wrapped)
    cbore_for_1_4_button_head_cap_screw1_10_cut = BRepAlgoAPI_Cut()
    cbore_for_1_4_button_head_cap_screw1_10_cut.SetArguments(cbore_for_1_4_button_head_cap_screw1_10_stock)
    cbore_for_1_4_button_head_cap_screw1_10_cut.SetTools(cbore_for_1_4_button_head_cap_screw1_10_tools)
    cbore_for_1_4_button_head_cap_screw1_10_cut.SetFuzzyValue(0.00001)
    cbore_for_1_4_button_head_cap_screw1_10_cut.Build()
    add(Compound.cast(cbore_for_1_4_button_head_cap_screw1_10_cut.Shape()).solids(), mode=Mode.REPLACE)


with BuildPart() as cbore_for_1_4_button_head_cap_screw1_11_tool:
    # Sketch2 at point 12 (carried to point 12, square into its face) → CBORE for 1_4 Button Head Cap Screw1 11 (revolve)
    with BuildSketch(Plane(origin=(-45.466333699, 44, 26.25), x_dir=(0, 0, -1), z_dir=(-1, 0, 0))):
        Polygon((0, 0), (0, 27.029827343), (3.3782, 25), (3.3782, 3.3528), (5.95376, 3.3528), (5.95376, 0.635), (6.58876, 0), align=None)
    revolve(axis=Axis((-45.466333699, 50.35, 26.25), (0, -1, 0)))


with BuildPart() as part_12:
    add(part_11.part)

    # CBORE for 1_4 Button Head Cap Screw1 11: cut by cbore_for_1_4_button_head_cap_screw1_11_tool, with a tolerance
    cbore_for_1_4_button_head_cap_screw1_11_stock = TopTools_ListOfShape()
    cbore_for_1_4_button_head_cap_screw1_11_stock.Append(part_12.part.wrapped)
    cbore_for_1_4_button_head_cap_screw1_11_tools = TopTools_ListOfShape()
    cbore_for_1_4_button_head_cap_screw1_11_tools.Append(cbore_for_1_4_button_head_cap_screw1_11_tool.part.wrapped)
    cbore_for_1_4_button_head_cap_screw1_11_cut = BRepAlgoAPI_Cut()
    cbore_for_1_4_button_head_cap_screw1_11_cut.SetArguments(cbore_for_1_4_button_head_cap_screw1_11_stock)
    cbore_for_1_4_button_head_cap_screw1_11_cut.SetTools(cbore_for_1_4_button_head_cap_screw1_11_tools)
    cbore_for_1_4_button_head_cap_screw1_11_cut.SetFuzzyValue(0.00001)
    cbore_for_1_4_button_head_cap_screw1_11_cut.Build()
    add(Compound.cast(cbore_for_1_4_button_head_cap_screw1_11_cut.Shape()).solids(), mode=Mode.REPLACE)


solid = part_12.part
